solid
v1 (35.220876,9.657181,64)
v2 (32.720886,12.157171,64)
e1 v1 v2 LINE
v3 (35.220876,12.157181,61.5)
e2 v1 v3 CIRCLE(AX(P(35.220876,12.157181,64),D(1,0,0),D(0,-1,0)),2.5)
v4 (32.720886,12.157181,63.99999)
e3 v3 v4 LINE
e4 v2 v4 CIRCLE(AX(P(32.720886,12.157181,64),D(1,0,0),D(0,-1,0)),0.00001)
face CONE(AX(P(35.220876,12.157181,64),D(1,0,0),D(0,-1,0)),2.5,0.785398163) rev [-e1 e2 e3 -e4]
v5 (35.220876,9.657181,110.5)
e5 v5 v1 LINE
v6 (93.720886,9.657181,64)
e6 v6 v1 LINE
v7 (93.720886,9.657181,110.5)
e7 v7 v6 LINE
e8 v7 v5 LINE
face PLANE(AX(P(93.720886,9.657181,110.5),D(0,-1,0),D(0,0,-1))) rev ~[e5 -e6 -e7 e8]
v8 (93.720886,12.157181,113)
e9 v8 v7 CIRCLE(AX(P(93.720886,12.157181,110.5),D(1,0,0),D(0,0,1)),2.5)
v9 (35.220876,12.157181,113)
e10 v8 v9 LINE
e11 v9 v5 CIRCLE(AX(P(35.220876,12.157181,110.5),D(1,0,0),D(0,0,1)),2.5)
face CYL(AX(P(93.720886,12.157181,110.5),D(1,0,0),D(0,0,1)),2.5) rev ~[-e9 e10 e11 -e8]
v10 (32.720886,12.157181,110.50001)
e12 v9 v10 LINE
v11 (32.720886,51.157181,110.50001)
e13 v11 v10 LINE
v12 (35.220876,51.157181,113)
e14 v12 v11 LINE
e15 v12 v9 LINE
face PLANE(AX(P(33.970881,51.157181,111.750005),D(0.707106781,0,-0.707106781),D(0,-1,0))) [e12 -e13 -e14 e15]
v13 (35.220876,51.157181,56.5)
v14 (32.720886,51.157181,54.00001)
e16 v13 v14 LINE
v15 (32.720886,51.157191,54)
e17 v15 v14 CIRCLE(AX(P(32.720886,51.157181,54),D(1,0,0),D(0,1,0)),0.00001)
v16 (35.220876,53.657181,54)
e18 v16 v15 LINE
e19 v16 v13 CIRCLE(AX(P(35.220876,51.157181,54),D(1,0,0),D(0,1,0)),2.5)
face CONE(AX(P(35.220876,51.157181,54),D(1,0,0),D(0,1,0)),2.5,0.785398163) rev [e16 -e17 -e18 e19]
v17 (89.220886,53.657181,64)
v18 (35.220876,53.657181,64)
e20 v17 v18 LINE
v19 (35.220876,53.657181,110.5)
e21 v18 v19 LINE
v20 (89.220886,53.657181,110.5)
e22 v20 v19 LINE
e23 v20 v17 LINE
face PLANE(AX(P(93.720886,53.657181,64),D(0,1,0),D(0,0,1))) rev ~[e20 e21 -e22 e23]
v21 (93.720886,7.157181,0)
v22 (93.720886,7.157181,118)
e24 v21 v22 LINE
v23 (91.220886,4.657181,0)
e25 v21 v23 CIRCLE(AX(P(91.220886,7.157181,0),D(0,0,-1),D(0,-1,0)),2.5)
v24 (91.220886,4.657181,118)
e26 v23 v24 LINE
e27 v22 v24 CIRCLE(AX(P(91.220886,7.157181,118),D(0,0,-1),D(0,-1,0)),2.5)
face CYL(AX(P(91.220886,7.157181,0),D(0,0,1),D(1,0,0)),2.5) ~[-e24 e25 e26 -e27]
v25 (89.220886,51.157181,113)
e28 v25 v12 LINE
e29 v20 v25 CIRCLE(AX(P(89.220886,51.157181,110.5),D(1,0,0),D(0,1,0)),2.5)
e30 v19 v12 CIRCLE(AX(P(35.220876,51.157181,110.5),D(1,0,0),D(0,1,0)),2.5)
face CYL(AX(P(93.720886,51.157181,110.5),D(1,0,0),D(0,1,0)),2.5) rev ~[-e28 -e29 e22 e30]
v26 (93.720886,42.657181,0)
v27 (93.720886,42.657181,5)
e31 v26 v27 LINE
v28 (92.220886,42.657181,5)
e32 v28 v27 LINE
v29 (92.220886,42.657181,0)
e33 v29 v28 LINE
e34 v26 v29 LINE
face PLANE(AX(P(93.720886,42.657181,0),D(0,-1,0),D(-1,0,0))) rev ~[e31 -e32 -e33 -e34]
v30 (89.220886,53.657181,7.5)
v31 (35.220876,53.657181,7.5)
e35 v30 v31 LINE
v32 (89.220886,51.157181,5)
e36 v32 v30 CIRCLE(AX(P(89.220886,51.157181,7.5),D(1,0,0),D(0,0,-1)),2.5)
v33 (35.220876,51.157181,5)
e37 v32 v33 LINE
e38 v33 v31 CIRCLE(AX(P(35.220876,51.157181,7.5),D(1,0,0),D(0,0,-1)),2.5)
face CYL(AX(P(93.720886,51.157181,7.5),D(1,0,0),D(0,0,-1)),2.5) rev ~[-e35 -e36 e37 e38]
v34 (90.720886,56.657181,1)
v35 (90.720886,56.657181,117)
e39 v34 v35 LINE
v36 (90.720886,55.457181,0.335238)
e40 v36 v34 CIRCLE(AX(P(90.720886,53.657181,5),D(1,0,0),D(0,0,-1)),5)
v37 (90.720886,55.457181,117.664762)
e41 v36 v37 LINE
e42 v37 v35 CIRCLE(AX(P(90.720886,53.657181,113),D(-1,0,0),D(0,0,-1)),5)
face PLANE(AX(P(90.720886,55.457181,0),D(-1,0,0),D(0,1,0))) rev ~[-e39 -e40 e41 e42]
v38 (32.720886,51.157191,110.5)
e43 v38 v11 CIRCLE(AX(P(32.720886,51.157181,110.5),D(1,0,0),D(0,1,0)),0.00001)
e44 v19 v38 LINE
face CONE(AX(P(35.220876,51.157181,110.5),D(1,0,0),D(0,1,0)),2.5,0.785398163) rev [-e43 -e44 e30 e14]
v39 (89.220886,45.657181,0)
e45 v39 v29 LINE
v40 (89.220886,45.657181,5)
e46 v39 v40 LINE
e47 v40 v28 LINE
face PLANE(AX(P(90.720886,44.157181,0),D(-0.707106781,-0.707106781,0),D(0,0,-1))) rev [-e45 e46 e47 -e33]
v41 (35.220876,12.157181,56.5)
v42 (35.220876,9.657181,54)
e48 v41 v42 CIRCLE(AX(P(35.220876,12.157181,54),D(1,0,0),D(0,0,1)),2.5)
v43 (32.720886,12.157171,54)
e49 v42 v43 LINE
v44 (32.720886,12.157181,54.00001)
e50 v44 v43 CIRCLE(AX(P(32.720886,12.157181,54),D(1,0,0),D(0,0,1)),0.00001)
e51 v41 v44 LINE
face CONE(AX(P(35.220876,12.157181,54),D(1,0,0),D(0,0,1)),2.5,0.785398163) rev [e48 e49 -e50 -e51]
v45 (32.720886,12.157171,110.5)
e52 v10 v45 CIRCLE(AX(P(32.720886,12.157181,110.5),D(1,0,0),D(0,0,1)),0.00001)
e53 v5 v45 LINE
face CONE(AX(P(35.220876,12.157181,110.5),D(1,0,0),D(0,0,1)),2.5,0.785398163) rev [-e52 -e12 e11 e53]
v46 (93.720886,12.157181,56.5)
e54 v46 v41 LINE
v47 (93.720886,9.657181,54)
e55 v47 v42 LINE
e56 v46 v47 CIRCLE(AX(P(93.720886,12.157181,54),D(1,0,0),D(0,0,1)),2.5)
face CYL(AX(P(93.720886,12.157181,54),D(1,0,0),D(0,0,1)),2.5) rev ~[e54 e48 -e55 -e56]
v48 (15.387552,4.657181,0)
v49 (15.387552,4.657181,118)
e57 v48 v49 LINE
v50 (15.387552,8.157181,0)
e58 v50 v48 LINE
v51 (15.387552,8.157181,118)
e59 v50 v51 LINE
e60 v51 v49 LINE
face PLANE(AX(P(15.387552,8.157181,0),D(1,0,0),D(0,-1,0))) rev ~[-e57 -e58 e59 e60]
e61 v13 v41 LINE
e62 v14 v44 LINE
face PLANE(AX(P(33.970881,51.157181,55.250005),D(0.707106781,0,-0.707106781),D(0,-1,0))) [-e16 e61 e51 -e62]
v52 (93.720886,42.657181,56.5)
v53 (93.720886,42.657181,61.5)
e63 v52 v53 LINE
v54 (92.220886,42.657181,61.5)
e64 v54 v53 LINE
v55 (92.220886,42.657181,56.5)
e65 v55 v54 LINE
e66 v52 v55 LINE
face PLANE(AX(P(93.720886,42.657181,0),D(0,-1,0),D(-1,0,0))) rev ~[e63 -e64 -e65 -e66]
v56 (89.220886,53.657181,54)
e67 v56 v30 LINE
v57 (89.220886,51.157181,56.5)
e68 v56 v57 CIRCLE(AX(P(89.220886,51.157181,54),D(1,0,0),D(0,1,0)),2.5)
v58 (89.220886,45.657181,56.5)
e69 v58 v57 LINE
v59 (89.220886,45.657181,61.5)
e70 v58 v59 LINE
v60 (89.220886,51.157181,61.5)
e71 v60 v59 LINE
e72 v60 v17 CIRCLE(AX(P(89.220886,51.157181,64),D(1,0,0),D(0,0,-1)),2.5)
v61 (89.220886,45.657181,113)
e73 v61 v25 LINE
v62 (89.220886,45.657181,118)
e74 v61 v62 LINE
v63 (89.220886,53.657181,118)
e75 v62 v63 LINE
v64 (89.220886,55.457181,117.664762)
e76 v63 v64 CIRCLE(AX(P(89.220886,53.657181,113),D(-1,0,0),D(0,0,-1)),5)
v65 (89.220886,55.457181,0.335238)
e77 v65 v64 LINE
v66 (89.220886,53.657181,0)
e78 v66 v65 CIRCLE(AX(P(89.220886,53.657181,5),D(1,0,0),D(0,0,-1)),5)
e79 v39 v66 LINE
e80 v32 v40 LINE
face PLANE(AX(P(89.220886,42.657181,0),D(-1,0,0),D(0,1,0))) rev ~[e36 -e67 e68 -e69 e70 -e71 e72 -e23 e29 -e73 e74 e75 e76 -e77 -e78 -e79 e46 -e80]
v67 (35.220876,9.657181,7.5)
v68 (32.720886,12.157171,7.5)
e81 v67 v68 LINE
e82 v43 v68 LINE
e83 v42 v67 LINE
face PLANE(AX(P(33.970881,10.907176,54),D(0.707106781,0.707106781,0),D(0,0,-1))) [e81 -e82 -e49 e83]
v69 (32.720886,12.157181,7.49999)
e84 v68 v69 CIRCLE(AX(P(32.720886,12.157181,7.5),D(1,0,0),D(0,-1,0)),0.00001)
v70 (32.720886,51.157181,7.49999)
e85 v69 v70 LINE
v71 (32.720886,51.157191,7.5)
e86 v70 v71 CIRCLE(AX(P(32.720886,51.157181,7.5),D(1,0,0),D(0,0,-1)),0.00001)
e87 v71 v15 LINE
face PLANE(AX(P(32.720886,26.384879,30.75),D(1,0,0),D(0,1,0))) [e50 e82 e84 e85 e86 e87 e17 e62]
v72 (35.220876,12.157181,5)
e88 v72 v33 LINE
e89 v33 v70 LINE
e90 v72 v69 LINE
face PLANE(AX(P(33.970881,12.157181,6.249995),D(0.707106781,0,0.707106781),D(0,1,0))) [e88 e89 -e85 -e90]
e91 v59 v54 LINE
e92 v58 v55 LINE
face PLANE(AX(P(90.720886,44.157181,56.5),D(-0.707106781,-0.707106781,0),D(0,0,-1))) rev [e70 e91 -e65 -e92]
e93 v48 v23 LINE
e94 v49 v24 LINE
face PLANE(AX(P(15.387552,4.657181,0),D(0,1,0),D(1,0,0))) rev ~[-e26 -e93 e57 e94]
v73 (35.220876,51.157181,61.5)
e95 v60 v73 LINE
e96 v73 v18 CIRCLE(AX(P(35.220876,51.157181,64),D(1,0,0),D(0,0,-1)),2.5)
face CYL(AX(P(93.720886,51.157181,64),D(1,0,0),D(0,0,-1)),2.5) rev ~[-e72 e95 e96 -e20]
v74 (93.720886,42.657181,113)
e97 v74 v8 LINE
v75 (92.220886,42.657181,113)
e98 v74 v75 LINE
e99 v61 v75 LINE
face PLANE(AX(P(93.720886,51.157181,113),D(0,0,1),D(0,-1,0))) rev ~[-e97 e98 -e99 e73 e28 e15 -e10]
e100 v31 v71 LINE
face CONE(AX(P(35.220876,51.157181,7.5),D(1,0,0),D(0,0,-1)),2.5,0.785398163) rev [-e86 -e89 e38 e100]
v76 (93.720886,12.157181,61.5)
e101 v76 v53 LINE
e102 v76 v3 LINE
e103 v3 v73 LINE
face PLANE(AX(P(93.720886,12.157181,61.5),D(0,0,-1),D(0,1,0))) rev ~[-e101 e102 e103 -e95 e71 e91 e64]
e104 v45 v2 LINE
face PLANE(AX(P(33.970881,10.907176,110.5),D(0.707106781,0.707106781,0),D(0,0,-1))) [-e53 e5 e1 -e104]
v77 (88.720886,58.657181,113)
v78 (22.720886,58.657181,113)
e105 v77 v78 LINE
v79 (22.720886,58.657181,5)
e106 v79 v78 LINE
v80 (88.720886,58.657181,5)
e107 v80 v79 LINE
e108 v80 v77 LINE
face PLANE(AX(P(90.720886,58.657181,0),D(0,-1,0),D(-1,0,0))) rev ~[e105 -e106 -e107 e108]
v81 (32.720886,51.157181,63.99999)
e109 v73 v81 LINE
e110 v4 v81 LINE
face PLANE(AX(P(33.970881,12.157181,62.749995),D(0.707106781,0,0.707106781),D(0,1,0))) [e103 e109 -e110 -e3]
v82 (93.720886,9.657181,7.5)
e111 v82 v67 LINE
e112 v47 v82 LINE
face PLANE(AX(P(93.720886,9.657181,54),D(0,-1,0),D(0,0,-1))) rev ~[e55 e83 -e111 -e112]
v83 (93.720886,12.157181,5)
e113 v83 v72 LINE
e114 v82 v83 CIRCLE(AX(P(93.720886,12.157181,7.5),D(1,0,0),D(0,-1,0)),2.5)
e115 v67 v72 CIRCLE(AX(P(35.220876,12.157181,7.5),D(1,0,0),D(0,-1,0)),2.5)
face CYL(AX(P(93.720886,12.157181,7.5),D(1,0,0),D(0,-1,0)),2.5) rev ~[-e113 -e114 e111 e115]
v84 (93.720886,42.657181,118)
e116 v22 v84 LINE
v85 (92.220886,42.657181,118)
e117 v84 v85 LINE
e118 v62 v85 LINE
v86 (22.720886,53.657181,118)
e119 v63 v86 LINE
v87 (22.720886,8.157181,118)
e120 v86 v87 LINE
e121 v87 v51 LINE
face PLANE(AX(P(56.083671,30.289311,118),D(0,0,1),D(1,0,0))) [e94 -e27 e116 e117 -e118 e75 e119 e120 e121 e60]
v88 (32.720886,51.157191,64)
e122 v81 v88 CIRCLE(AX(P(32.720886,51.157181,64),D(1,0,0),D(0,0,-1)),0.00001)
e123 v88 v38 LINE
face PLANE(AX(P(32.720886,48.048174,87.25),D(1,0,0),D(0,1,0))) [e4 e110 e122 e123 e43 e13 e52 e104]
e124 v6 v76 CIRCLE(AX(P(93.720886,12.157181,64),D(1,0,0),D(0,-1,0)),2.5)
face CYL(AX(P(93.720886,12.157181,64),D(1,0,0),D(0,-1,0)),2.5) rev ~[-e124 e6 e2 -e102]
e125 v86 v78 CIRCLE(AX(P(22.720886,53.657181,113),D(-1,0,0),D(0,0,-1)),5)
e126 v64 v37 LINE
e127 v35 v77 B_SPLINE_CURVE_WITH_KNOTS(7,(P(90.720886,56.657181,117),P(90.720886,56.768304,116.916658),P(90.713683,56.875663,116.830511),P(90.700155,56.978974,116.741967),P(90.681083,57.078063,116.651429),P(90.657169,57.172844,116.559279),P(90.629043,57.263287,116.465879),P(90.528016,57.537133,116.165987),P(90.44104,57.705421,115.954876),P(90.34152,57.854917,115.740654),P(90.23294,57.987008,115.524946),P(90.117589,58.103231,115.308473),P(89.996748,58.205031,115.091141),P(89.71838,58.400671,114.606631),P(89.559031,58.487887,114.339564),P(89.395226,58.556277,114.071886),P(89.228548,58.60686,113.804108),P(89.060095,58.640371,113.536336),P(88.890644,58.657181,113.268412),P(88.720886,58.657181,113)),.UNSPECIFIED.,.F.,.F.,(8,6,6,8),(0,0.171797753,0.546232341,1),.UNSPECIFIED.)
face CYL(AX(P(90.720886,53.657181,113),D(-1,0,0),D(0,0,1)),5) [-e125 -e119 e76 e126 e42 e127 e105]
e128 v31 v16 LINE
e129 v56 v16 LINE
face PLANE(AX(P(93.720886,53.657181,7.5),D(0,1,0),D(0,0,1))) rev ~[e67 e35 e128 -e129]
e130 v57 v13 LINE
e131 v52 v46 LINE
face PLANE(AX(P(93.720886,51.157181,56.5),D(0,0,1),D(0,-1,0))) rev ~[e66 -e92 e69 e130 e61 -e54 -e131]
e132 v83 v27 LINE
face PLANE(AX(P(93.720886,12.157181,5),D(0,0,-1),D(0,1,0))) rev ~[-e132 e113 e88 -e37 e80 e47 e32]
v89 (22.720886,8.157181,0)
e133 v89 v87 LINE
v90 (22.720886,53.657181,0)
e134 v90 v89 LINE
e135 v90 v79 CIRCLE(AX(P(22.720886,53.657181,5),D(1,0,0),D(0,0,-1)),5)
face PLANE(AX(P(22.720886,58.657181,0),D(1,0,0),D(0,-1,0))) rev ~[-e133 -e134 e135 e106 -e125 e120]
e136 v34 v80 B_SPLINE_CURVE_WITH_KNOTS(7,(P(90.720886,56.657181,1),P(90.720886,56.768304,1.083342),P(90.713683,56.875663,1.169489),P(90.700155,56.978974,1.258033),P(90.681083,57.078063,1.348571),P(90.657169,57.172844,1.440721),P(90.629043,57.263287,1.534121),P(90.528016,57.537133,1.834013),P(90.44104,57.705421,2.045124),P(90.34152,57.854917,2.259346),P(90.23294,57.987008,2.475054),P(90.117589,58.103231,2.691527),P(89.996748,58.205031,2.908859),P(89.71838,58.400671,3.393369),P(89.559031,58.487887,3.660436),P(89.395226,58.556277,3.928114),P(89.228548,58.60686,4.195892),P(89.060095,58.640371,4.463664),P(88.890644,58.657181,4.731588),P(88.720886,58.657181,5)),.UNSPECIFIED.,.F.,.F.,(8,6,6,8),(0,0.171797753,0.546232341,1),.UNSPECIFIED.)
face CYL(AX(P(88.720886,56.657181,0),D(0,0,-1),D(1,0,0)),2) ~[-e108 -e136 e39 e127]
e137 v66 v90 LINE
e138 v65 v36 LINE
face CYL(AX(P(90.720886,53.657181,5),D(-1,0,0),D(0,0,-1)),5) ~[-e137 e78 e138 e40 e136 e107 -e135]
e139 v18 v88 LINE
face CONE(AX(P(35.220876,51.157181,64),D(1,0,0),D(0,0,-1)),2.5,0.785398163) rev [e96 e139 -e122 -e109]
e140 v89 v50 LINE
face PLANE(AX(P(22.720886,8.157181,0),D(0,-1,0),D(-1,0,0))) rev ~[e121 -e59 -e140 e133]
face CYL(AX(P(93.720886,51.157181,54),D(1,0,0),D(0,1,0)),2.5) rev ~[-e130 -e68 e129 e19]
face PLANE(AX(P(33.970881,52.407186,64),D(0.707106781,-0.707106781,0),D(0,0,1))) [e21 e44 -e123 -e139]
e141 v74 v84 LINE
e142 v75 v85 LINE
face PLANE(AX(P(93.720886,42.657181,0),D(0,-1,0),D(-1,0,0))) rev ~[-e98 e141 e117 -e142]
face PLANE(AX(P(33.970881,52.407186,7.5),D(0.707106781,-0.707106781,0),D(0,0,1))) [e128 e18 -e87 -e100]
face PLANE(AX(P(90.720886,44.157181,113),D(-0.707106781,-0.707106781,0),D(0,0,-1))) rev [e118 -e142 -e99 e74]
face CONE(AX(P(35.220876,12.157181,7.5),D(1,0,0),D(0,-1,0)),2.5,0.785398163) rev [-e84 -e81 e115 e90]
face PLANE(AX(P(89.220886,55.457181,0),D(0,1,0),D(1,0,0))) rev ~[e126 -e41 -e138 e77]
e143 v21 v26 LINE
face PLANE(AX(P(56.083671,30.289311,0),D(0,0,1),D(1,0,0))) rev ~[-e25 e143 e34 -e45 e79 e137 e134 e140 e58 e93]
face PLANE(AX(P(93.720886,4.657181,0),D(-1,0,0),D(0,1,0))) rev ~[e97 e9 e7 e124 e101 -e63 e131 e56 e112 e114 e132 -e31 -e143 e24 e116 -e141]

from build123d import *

# Parameters (mm, degrees)
F1_DEPTH    = 118
F4_DEPTH    = 61
F5_SIZE     = 2.49999
F6_R        = 5
F7_SIZE     = 3
F8_R        = 2.5
F9_T1_DEPTH = 118


# Not quite as in the source:
# - a fillet or chamfer that OpenCascade refuses, or shapes differently, is made with other operations: its cross-section is extruded or revolved along the edge and cut away or added
# - a fillet or chamfer is up to 0.001 mm smaller than in the source, because OpenCascade refuses the exact size


with BuildPart() as f1:
    # F0 (on Top) → F1 (new body)
    with BuildSketch(Plane.XY):
        Polygon((15.3875516164, 8.1571814393), (15.3875516164, 4.6571814393), (93.7208858402, 4.6571814393), (93.7208858402, 42.6571814393), (89.2208858402, 42.6571814393), (89.2208858402, 55.4571814393), (90.7208858402, 55.4571814393), (90.7208858402, 58.6571814393), (22.7208858402, 58.6571814393), (22.7208858402, 8.1571814393), align=None)
    extrude(amount=F1_DEPTH)

    # F3 (on face) → F4 (cut)
    with BuildSketch(Plane.YZ.offset(93.7208858402)):
        with BuildLine():
            Line((51.1571814393, 113), (42.6571814393, 113))
            Line((42.6571814393, 113), (42.6571814393, 61.5))
            Line((42.6571814393, 61.5), (51.1571814393, 61.5))
            ThreePointArc((51.1571814393, 61.5), (52.9249483923, 62.232233047), (53.6571814393, 64))
            Line((53.6571814393, 64), (53.6571814393, 110.5))
            ThreePointArc((53.6571814393, 110.5), (52.9249483923, 112.267766953), (51.1571814393, 113))
        make_face()
        with BuildLine():
            Line((42.6571814393, 61.5), (42.6571814393, 113))
            Line((42.6571814393, 113), (12.1571814393, 113))
            ThreePointArc((12.1571814393, 113), (10.3894144863, 112.267766953), (9.6571814393, 110.5))
            Line((9.6571814393, 110.5), (9.6571814393, 64))
            ThreePointArc((9.6571814393, 64), (10.3894144863, 62.232233047), (12.1571814393, 61.5))
            Line((12.1571814393, 61.5), (42.6571814393, 61.5))
        make_face()
        with BuildLine():
            Line((12.1571814393, 5), (42.6571814393, 5))
            Line((42.6571814393, 5), (42.6571814393, 56.5))
            Line((42.6571814393, 56.5), (12.1571814393, 56.5))
            ThreePointArc((12.1571814393, 56.5), (10.3894144863, 55.767766953), (9.6571814393, 54))
            Line((9.6571814393, 54), (9.6571814393, 7.5))
            ThreePointArc((9.6571814393, 7.5), (10.3894144863, 5.732233047), (12.1571814393, 5))
        make_face()
        with BuildLine():
            Line((42.6571814393, 56.5), (42.6571814393, 5))
            Line((42.6571814393, 5), (51.1571814393, 5))
            ThreePointArc((51.1571814393, 5), (52.9249483923, 5.732233047), (53.6571814393, 7.5))
            Line((53.6571814393, 7.5), (53.6571814393, 54))
            ThreePointArc((53.6571814393, 54), (52.9249483923, 55.767766953), (51.1571814393, 56.5))
            Line((51.1571814393, 56.5), (42.6571814393, 56.5))
        make_face()
    extrude(amount=-F4_DEPTH, mode=Mode.SUBTRACT)

    # F5 (size 2.5 in the source; OpenCascade refuses exactly that, so slightly less here)
    f5_edges = [f1.edges().sort_by_distance(p)[0] for p in [
        (32.720886, 52.924948, 112.267767),
        (32.720886, 31.657181, 113),
        (32.720886, 10.389414, 112.267767),
        (32.720886, 9.657181, 87.25),
        (32.720886, 10.389414, 62.232233),
        (32.720886, 31.657181, 61.5),
        (32.720886, 52.924948, 62.232233),
        (32.720886, 53.657181, 87.25),
        (32.720886, 10.389414, 5.732233),
        (32.720886, 31.657181, 5),
        (32.720886, 52.924948, 5.732233),
        (32.720886, 53.657181, 30.75),
        (32.720886, 52.924948, 55.767767),
        (32.720886, 31.657181, 56.5),
        (32.720886, 10.389414, 55.767767),
        (32.720886, 9.657181, 30.75),
    ]]
    chamfer(f5_edges, length=F5_SIZE)

    # F6
    f6_edges = [f1.edges().sort_by_distance(p)[0] for p in [
        (56.720886, 58.657181, 118),
        (56.720886, 58.657181, 0),
    ]]
    fillet(f6_edges, radius=F6_R)

    # F7
    f7_edges = [f1.edges().sort_by_distance(p)[0] for p in [
        (89.220886, 42.657181, 59),
        (89.220886, 42.657181, 2.5),
        (89.220886, 42.657181, 115.5),
    ]]
    chamfer(f7_edges, length=F7_SIZE)

    # F8
    f8_edges = [f1.edges().sort_by_distance(p)[0] for p in [
        (93.720886, 4.657181, 59),
    ]]
    fillet(f8_edges, radius=F8_R)

    # F9: fillet of radius 2 on 1 edges, made by hand

    # F9_s2 → F9_t1 (cut)
    with BuildSketch(Plane.XY):
        with BuildLine():
            ThreePointArc((90.7208858402, 56.6571814393), (90.1350994026, 58.0713950017), (88.7208858402, 58.6571814393))
            Line((88.7208858402, 58.6571814393), (90.7208858402, 58.6571814393))
            Line((90.7208858402, 58.6571814393), (90.7208858402, 56.6571814393))
        make_face()
    extrude(amount=F9_T1_DEPTH, mode=Mode.SUBTRACT)


solid = f1.part
